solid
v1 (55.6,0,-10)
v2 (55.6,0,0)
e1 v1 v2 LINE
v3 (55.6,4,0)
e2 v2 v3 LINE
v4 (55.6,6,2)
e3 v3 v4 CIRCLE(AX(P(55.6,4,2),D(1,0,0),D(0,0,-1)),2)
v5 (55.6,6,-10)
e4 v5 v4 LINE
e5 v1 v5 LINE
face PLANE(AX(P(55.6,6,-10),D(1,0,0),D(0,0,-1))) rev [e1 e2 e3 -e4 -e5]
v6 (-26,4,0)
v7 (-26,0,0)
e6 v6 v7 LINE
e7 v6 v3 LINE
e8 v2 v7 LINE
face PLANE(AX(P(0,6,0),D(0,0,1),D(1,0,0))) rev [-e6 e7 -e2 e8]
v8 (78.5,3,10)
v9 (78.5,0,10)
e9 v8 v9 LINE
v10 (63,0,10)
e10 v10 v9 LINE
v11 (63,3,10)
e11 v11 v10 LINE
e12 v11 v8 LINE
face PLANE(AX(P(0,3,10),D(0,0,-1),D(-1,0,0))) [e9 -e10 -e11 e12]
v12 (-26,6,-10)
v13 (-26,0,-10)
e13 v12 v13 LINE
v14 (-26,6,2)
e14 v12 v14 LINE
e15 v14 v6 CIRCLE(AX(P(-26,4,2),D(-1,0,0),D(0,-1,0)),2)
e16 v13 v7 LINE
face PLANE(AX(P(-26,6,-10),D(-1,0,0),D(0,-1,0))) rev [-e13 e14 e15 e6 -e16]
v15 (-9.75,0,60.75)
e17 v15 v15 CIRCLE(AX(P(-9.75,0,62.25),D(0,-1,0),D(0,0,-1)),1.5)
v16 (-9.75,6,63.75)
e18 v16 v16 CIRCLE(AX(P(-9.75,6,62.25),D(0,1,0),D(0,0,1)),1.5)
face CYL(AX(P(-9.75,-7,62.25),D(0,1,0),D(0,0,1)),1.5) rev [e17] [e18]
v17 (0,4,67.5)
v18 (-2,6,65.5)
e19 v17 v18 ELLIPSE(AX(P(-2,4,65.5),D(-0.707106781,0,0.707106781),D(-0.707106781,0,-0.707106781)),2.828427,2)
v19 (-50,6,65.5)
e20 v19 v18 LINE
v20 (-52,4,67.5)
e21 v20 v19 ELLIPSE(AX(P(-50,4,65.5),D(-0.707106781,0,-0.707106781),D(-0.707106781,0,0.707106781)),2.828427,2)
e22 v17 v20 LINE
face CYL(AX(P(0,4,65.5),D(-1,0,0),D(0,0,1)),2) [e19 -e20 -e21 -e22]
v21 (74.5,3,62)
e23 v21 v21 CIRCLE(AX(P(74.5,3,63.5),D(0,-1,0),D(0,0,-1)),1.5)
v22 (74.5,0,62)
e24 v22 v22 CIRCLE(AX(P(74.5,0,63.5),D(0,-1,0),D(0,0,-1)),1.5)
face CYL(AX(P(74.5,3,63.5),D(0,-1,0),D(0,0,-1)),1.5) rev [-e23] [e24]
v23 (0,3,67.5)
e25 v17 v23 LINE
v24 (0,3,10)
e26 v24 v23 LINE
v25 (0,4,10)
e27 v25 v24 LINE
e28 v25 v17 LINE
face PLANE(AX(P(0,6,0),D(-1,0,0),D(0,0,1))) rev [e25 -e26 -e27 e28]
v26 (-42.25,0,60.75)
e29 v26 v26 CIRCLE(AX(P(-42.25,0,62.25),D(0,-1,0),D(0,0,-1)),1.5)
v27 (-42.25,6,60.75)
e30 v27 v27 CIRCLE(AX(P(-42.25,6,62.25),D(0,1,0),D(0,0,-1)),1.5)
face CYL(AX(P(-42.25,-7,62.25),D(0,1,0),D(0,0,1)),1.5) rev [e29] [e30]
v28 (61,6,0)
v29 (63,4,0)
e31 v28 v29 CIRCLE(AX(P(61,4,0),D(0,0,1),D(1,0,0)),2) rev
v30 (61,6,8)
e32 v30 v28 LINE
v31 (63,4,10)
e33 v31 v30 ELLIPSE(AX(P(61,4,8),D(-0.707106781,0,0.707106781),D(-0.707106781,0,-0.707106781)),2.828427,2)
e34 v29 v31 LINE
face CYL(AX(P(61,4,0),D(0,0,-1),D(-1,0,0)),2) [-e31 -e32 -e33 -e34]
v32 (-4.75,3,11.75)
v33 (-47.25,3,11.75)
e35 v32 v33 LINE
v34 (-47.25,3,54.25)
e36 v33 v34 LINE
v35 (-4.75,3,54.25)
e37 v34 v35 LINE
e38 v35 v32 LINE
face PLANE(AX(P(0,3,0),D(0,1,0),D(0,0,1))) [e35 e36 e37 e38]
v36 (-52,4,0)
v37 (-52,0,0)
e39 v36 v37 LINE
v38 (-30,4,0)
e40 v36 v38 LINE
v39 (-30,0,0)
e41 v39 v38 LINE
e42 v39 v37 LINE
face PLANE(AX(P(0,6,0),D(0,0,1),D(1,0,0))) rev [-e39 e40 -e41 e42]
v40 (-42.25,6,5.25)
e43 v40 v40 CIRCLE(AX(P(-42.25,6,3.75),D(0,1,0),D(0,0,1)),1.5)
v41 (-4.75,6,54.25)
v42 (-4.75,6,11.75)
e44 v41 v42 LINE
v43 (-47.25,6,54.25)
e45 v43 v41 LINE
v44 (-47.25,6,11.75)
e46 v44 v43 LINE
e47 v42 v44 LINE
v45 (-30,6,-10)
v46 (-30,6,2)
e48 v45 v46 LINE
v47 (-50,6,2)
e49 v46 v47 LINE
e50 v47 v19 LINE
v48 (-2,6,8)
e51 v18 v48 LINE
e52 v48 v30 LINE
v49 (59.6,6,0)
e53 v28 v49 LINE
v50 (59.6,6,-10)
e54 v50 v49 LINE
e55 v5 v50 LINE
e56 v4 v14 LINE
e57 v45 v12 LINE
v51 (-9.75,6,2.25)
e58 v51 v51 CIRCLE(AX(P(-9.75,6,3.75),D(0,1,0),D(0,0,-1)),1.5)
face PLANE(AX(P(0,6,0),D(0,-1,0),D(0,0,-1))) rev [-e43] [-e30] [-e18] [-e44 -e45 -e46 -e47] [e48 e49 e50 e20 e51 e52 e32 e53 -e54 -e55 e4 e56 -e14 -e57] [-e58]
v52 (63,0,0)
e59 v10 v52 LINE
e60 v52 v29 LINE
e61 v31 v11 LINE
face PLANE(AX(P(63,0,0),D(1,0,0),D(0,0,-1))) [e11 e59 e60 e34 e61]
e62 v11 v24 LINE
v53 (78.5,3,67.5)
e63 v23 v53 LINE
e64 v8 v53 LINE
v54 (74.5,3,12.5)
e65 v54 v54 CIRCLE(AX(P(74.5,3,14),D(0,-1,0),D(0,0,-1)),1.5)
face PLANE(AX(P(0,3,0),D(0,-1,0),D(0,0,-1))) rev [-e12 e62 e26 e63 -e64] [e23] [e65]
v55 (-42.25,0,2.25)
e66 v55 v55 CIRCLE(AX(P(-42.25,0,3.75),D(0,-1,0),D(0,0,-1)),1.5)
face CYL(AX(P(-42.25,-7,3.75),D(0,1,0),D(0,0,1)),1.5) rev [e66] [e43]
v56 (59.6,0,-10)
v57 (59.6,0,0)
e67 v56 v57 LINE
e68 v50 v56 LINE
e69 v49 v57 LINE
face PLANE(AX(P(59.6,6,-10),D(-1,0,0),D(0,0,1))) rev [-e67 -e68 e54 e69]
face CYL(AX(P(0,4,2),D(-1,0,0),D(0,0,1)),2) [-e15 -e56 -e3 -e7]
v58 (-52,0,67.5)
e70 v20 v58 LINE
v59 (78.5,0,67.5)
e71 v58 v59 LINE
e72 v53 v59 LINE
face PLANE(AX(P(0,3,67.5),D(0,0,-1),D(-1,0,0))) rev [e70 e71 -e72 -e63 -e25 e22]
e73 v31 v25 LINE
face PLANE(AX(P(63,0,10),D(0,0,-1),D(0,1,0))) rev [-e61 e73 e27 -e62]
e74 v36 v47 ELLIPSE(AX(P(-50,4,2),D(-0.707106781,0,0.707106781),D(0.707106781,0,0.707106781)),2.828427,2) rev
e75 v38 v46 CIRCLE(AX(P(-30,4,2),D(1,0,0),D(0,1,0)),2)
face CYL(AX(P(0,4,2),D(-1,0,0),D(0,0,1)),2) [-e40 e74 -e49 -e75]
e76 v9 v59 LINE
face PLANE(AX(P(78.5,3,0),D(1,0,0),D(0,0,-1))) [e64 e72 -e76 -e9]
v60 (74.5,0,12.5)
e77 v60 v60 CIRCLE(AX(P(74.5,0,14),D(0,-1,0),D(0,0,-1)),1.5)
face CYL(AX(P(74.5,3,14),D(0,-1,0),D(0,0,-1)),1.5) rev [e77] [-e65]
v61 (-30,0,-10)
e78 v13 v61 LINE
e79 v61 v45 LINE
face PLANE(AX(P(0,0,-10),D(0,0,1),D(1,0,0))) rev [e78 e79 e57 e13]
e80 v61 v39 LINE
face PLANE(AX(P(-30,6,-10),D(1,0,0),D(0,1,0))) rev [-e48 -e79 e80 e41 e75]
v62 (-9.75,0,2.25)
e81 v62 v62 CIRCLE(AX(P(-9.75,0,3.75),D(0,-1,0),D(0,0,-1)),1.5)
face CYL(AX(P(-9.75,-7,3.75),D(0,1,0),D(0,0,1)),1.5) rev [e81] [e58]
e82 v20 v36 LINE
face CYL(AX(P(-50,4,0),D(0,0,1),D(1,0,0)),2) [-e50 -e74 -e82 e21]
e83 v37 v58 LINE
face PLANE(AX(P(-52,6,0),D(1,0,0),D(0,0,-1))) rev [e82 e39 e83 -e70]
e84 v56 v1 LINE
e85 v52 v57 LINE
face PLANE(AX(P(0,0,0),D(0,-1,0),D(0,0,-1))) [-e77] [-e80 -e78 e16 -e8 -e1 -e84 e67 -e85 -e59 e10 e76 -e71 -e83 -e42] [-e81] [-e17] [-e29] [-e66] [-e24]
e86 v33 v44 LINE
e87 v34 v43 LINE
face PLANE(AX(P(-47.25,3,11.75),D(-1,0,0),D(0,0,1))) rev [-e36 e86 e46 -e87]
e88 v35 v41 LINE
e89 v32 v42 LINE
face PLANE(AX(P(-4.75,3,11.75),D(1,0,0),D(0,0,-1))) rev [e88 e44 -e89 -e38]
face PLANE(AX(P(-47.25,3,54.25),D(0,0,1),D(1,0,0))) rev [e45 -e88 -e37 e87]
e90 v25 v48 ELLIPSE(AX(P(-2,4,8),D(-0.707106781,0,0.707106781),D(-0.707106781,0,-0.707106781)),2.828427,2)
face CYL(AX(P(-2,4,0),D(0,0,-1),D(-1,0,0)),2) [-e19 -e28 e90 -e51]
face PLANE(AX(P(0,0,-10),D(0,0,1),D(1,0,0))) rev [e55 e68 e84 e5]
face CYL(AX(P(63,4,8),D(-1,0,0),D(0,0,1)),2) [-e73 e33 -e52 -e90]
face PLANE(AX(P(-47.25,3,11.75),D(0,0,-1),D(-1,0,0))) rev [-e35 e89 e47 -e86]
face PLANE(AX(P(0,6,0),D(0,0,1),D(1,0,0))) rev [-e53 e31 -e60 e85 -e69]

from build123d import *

# Parameters (mm, degrees)
SKETCH1_W                 = 52
SKETCH1_H                 = 66
BOSS_EXTRUDE1_DEPTH       = 6
SKETCH2_W                 = 42.5
SKETCH2_H                 = 42.5
CUT_EXTRUDE1_DEPTH        = 3
SKETCH3_R                 = 1.5
CUT_EXTRUDE2_DEPTH        = 13
SKETCH4_W                 = 10
SKETCH4_H                 = 6
BOSS_EXTRUDE2_DEPTH       = 63
SKETCH5_W                 = 4
SKETCH5_H                 = 6
BOSS_EXTRUDE3_DEPTH       = 10
SKETCH6_R                 = 0.75
CUT_EXTRUDE3_DEPTH        = 114
BOSS_EXTRUDE4_START       = -3
BOSS_EXTRUDE4_OUTLINE_W   = 78.5
BOSS_EXTRUDE4_OUTLINE_H   = 57.5
BOSS_EXTRUDE4_OUTLINE_R   = 1.5
BOSS_EXTRUDE4_DEPTH       = 3
BOSS_EXTRUDE4_START_2     = -30
BOSS_EXTRUDE4_2_OUTLINE_R = 0.75
BOSS_EXTRUDE4_2_DEPTH     = 4
BOSS_EXTRUDE4_START_3     = 55.6
BOSS_EXTRUDE4_3_OUTLINE_R = 0.75
BOSS_EXTRUDE4_3_DEPTH     = 4
SKETCH8_W                 = 52
SKETCH8_H                 = 1.5
BOSS_EXTRUDE5_DEPTH       = 6
FILLET1_R                 = 2


# Read off the part's stored shape, not the designer's step: Boss-Extrude4
with BuildPart() as part:
    # Sketch1 → Boss-Extrude1 (new body)
    with BuildSketch(Plane(origin=(0, 0, 0), x_dir=(1, 0, 0), z_dir=(0, 1, 0))):
        with Locations((-26, -33)):
            Rectangle(SKETCH1_W, SKETCH1_H)
    extrude(amount=BOSS_EXTRUDE1_DEPTH)

    # Sketch2 → Cut-Extrude1 (cut)
    with BuildSketch(Plane(origin=(0, 6, 0), x_dir=(1, 0, 0), z_dir=(0, 1, 0))):
        with Locations((-26, -33)):
            Rectangle(SKETCH2_W, SKETCH2_H)
    extrude(amount=-CUT_EXTRUDE1_DEPTH, mode=Mode.SUBTRACT)

    # Sketch3 → Cut-Extrude2 (cut)
    with BuildSketch(Plane(origin=(0, 6, 0), x_dir=(1, 0, 0), z_dir=(0, 1, 0))):
        with Locations(Location((-42.25, -3.75, 0), (0, 0, 270))):
            Circle(SKETCH3_R)
        with Locations(Location((-9.75, -3.75, 0), (0, 0, 90))):
            Circle(SKETCH3_R)
        with Locations(Location((-9.75, -62.25, 0), (0, 0, 270))):
            Circle(SKETCH3_R)
        with Locations(Location((-42.25, -62.25, 0), (0, 0, 90))):
            Circle(SKETCH3_R)
    extrude(amount=-CUT_EXTRUDE2_DEPTH, mode=Mode.SUBTRACT)

    # Sketch4 → Boss-Extrude2 (add)
    with BuildSketch(Plane(origin=(0, 0, 0), x_dir=(0, 0, -1), z_dir=(1, 0, 0))):
        with Locations((-5, 3)):
            Rectangle(SKETCH4_W, SKETCH4_H)
    extrude(amount=BOSS_EXTRUDE2_DEPTH)

    # Sketch5 → Boss-Extrude3 (add)
    with BuildSketch(Plane(origin=(0, 0, 0), x_dir=(-1, 0, 0), z_dir=(0, 0, -1))):
        with Locations((28, 3)):
            Rectangle(SKETCH5_W, SKETCH5_H)
        with Locations((-57.6, 3)):
            Rectangle(SKETCH5_W, SKETCH5_H)
    extrude(amount=BOSS_EXTRUDE3_DEPTH)

    # Sketch6 → Cut-Extrude3 (cut)
    with BuildSketch(Plane(origin=(59.6, 0, 0), x_dir=(0, 0, -1), z_dir=(1, 0, 0))):
        with Locations((4, 1.5)):
            Circle(SKETCH6_R)
    extrude(amount=-CUT_EXTRUDE3_DEPTH, mode=Mode.SUBTRACT)

    # Boss-Extrude4 outline → Boss-Extrude4 (add)
    with BuildSketch(Plane(origin=(0, 0, 0), x_dir=(-1, 0, 0), z_dir=(0, -1, 0)).offset(BOSS_EXTRUDE4_START)):
        with Locations((-39.25, -38.75)):
            Rectangle(BOSS_EXTRUDE4_OUTLINE_W, BOSS_EXTRUDE4_OUTLINE_H)
        with Locations((-74.5, -63.5)):
            Circle(BOSS_EXTRUDE4_OUTLINE_R, mode=Mode.SUBTRACT)
        with Locations((-74.5, -14)):
            Circle(BOSS_EXTRUDE4_OUTLINE_R, mode=Mode.SUBTRACT)
    extrude(amount=BOSS_EXTRUDE4_DEPTH)

    # Boss-Extrude4 2 outline → Boss-Extrude4 2 (add)
    with BuildSketch(Plane.YZ.offset(BOSS_EXTRUDE4_START_2)):
        with Locations((1.5, -4)):
            Circle(BOSS_EXTRUDE4_2_OUTLINE_R)
    extrude(amount=BOSS_EXTRUDE4_2_DEPTH)

    # Boss-Extrude4 3 outline → Boss-Extrude4 3 (add)
    with BuildSketch(Plane.YZ.offset(BOSS_EXTRUDE4_START_3)):
        with Locations((1.5, -4)):
            Circle(BOSS_EXTRUDE4_3_OUTLINE_R)
    extrude(amount=BOSS_EXTRUDE4_3_DEPTH)

    # Sketch8 → Boss-Extrude5 (add)
    with BuildSketch(Plane(origin=(0, 0, 0), x_dir=(-1, 0, 0), z_dir=(0, -1, 0))):
        with Locations((26, -66.75)):
            Rectangle(SKETCH8_W, SKETCH8_H)
    extrude(amount=-BOSS_EXTRUDE5_DEPTH)

    # Fillet1
    fillet1_edges = [part.edges().sort_by_distance(p)[0] for p in [
        (-52, 6, 33.75),
        (-26, 6, 67.5),
        (0, 6, 38.75),
        (31.5, 6, 10),
        (63, 6, 5),
        (-41, 6, 0),
        (14.8, 6, 0),
    ]]
    fillet(fillet1_edges, radius=FILLET1_R)


solid = part.part
